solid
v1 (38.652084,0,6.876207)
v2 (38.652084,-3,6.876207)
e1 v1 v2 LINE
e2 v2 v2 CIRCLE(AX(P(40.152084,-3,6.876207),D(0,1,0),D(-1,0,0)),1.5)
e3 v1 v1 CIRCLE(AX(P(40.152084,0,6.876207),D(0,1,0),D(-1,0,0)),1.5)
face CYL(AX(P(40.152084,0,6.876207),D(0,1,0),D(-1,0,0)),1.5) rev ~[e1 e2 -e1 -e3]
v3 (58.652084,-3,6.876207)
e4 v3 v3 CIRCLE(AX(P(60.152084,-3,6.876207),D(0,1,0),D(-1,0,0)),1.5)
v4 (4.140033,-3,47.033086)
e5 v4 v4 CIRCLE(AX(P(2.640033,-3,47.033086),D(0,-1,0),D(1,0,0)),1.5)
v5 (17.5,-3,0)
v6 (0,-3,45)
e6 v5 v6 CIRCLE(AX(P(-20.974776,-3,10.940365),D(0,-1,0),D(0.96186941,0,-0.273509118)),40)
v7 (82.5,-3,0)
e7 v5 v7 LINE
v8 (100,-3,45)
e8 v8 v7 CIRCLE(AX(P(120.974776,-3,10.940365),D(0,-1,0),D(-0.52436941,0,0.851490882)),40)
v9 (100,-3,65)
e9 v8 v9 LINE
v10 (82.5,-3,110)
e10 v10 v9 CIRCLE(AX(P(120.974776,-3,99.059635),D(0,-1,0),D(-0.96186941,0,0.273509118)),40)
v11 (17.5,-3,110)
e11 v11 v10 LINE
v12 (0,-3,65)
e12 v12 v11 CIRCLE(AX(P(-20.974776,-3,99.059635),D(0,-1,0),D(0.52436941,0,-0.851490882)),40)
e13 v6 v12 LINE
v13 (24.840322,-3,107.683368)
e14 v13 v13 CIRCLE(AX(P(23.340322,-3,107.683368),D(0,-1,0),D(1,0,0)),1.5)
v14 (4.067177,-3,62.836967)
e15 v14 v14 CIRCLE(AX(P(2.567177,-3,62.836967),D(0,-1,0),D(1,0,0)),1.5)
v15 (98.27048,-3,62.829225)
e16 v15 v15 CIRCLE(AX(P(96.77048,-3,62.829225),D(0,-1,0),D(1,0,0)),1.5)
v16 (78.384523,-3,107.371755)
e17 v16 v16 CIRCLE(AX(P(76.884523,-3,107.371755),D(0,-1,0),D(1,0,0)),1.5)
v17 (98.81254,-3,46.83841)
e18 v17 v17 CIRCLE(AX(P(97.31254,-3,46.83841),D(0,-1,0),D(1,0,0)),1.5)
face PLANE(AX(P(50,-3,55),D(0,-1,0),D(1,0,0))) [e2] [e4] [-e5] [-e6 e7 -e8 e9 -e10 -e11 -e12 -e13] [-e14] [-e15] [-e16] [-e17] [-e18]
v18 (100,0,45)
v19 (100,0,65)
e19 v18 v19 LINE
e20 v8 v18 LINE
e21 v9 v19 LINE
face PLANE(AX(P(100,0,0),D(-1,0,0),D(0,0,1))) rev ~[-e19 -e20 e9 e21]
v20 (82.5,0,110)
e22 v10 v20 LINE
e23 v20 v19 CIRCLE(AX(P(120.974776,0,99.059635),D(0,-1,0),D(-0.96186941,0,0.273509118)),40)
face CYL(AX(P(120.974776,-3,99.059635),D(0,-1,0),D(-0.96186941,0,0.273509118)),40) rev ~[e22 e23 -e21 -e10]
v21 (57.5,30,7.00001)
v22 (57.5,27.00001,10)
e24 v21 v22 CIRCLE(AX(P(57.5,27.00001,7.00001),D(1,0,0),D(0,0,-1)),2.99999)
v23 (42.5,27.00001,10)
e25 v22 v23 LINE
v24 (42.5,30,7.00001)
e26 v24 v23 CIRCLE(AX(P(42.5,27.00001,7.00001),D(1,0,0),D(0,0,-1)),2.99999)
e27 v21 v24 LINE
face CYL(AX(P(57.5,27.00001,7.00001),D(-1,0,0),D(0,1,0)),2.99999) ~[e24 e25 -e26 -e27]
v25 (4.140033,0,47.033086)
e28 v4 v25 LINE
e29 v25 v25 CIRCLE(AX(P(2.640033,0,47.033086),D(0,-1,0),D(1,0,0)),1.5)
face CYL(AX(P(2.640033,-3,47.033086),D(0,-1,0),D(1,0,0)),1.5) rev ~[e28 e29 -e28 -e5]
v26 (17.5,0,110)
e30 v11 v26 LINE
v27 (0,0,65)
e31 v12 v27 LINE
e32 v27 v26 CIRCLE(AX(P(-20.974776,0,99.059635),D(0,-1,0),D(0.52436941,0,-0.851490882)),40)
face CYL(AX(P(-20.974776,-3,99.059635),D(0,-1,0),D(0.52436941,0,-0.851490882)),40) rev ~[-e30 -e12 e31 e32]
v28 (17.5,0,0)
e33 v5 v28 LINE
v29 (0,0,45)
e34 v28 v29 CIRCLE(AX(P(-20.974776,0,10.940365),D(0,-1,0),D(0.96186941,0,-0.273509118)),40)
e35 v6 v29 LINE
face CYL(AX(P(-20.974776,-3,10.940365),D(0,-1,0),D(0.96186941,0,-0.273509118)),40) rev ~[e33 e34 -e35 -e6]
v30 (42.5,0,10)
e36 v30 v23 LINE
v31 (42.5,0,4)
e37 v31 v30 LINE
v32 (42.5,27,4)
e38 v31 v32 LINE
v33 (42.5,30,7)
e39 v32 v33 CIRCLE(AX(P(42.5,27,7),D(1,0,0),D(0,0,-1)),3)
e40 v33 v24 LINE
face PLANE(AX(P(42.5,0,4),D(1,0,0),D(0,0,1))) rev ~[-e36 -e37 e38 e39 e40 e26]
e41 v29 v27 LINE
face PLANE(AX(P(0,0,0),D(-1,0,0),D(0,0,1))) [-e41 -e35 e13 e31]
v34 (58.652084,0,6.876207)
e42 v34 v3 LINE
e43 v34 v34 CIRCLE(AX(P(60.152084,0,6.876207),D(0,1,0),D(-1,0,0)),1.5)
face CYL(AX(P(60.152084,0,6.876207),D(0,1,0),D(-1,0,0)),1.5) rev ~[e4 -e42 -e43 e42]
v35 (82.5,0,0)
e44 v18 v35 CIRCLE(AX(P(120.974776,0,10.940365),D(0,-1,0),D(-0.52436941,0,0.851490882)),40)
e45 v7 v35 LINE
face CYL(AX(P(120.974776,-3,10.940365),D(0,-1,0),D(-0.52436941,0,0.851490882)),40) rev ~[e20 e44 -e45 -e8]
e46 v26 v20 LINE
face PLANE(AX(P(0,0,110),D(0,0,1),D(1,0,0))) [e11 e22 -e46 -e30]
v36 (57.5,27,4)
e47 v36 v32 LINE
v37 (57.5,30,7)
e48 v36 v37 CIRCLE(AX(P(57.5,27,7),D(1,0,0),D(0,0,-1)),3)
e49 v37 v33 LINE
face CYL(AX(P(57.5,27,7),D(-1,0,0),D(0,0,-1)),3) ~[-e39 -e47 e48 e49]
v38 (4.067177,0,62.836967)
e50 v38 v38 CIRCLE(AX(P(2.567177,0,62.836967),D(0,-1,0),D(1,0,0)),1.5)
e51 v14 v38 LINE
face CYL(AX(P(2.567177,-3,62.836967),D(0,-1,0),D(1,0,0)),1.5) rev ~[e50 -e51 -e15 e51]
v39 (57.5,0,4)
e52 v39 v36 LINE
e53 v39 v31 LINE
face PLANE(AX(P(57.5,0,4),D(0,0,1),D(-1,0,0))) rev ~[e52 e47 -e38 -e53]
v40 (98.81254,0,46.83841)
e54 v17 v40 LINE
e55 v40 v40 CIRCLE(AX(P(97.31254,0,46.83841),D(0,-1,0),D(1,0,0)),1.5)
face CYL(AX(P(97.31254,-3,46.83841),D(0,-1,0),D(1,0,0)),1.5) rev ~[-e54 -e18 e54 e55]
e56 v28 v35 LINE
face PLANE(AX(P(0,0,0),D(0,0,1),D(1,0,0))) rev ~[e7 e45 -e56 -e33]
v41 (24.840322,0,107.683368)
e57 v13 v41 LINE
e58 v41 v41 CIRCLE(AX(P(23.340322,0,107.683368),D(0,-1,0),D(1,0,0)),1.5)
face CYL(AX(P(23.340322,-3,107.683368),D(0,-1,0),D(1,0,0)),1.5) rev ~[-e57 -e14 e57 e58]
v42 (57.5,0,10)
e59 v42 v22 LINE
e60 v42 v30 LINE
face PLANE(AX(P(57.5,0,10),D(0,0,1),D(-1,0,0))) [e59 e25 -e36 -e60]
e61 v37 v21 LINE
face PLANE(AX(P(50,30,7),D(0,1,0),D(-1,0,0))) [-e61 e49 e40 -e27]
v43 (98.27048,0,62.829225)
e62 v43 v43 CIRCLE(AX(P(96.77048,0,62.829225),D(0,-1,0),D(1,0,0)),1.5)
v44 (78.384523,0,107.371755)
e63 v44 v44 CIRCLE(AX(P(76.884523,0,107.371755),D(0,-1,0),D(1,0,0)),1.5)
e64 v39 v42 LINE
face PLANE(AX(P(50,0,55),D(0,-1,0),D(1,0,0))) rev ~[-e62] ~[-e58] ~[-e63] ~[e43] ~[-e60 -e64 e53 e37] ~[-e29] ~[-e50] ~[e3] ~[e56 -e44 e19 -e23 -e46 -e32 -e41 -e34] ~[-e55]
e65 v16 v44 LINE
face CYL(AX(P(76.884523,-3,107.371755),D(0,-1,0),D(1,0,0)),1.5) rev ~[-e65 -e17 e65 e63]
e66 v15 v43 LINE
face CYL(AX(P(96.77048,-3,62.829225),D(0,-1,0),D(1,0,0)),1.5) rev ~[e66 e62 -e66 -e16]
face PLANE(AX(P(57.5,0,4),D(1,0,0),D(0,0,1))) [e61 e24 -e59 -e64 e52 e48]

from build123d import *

# Parameters (mm, degrees)
F0_W      = 100
F0_H      = 110
F1_DEPTH  = 3
F3_DEPTH  = 25
F4_W      = 15
F4_H      = 6
F5_DEPTH  = 30
F6_R      = 3
F7_R      = 2.99999
F8_R      = 1.5
F9_DEPTH  = 25
F10_R     = 1.5
F11_DEPTH = 25
F12_R     = 1.5
F13_DEPTH = 25
F14_R     = 1.5
F15_DEPTH = 25


# Not quite as in the source:
# - a fillet or chamfer is up to 0.001 mm smaller than in the source, because OpenCascade refuses the exact size


with BuildPart() as f1:
    # F0 (on Front) → F1 (new body)
    with BuildSketch(Plane.XZ):
        with Locations((50, 55)):
            Rectangle(F0_W, F0_H)
    extrude(amount=F1_DEPTH)

    # F2 (on face) → F3 (cut)
    with BuildSketch(Plane.XZ.offset(3)):
        with BuildLine():
            Line((0, 110), (0, 65))
            ThreePointArc((0, 65), (16.3054104548, 84.5617848231), (17.5, 110))
            Line((17.5, 110), (0, 110))
        make_face()
        with BuildLine():
            Line((100, 110), (82.5, 110))
            ThreePointArc((82.5, 110), (83.6945895452, 84.5617848231), (100, 65))
            Line((100, 65), (100, 110))
        make_face()
        with BuildLine():
            ThreePointArc((100, 45), (83.6945895452, 25.4382151769), (82.5, 0))
            Line((82.5, 0), (100, 0))
            Line((100, 0), (100, 45))
        make_face()
        with BuildLine():
            Line((0, 45), (0, 0))
            Line((0, 0), (17.5, 0))
            ThreePointArc((17.5, 0), (16.3054104548, 25.4382151769), (0, 45))
        make_face()
    extrude(amount=-F3_DEPTH, mode=Mode.SUBTRACT)

    # F4 (on face) → F5 (join)
    with BuildSketch(Plane(origin=(0, 0, 0), x_dir=(-1, 0, 0), z_dir=(0, 1, 0))):
        with Locations((-50, 7)):
            Rectangle(F4_W, F4_H)
    extrude(amount=F5_DEPTH)

    # F6
    f6_edges = [f1.edges().sort_by_distance(p)[0] for p in [
        (50, 30, 4),
    ]]
    fillet(f6_edges, radius=F6_R)

    # F7 (radius 3 in the source; OpenCascade refuses exactly that, so slightly less here)
    f7_edges = [f1.edges().sort_by_distance(p)[0] for p in [
        (50, 30, 10),
    ]]
    fillet(f7_edges, radius=F7_R)

    # F8 (on face) → F9 (cut)
    with BuildSketch(Plane(origin=(0, 0, 0), x_dir=(-1, 0, 0), z_dir=(0, 1, 0))):
        with Locations((-40.1520836353, 6.8762069568)):
            Circle(F8_R)
        with Locations((-60.1520836353, 6.8762069568)):
            Circle(F8_R)
    extrude(amount=-F9_DEPTH, mode=Mode.SUBTRACT)

    # F10 (on face) → F11 (cut)
    with BuildSketch(Plane.XZ.offset(3)):
        with Locations((23.3403220773, 107.6833680272)):
            Circle(F10_R)
        with Locations((76.8845230341, 107.3717549443)):
            Circle(F10_R)
    extrude(amount=-F11_DEPTH, mode=Mode.SUBTRACT)

    # F12 (on face) → F13 (cut)
    with BuildSketch(Plane.XZ.offset(3)):
        with Locations((96.7704804272, 62.8292252972)):
            Circle(F12_R)
        with Locations((97.3125401127, 46.8384100805)):
            Circle(F12_R)
        with Locations((2.5671770603, 62.836966732)):
            Circle(F12_R)
    extrude(amount=-F13_DEPTH, mode=Mode.SUBTRACT)

    # F14 (on face) → F15 (cut)
    with BuildSketch(Plane.XZ.offset(3)):
        with Locations((2.6400329079, 47.0330864191)):
            Circle(F14_R)
    extrude(amount=-F15_DEPTH, mode=Mode.SUBTRACT)


solid = f1.part
